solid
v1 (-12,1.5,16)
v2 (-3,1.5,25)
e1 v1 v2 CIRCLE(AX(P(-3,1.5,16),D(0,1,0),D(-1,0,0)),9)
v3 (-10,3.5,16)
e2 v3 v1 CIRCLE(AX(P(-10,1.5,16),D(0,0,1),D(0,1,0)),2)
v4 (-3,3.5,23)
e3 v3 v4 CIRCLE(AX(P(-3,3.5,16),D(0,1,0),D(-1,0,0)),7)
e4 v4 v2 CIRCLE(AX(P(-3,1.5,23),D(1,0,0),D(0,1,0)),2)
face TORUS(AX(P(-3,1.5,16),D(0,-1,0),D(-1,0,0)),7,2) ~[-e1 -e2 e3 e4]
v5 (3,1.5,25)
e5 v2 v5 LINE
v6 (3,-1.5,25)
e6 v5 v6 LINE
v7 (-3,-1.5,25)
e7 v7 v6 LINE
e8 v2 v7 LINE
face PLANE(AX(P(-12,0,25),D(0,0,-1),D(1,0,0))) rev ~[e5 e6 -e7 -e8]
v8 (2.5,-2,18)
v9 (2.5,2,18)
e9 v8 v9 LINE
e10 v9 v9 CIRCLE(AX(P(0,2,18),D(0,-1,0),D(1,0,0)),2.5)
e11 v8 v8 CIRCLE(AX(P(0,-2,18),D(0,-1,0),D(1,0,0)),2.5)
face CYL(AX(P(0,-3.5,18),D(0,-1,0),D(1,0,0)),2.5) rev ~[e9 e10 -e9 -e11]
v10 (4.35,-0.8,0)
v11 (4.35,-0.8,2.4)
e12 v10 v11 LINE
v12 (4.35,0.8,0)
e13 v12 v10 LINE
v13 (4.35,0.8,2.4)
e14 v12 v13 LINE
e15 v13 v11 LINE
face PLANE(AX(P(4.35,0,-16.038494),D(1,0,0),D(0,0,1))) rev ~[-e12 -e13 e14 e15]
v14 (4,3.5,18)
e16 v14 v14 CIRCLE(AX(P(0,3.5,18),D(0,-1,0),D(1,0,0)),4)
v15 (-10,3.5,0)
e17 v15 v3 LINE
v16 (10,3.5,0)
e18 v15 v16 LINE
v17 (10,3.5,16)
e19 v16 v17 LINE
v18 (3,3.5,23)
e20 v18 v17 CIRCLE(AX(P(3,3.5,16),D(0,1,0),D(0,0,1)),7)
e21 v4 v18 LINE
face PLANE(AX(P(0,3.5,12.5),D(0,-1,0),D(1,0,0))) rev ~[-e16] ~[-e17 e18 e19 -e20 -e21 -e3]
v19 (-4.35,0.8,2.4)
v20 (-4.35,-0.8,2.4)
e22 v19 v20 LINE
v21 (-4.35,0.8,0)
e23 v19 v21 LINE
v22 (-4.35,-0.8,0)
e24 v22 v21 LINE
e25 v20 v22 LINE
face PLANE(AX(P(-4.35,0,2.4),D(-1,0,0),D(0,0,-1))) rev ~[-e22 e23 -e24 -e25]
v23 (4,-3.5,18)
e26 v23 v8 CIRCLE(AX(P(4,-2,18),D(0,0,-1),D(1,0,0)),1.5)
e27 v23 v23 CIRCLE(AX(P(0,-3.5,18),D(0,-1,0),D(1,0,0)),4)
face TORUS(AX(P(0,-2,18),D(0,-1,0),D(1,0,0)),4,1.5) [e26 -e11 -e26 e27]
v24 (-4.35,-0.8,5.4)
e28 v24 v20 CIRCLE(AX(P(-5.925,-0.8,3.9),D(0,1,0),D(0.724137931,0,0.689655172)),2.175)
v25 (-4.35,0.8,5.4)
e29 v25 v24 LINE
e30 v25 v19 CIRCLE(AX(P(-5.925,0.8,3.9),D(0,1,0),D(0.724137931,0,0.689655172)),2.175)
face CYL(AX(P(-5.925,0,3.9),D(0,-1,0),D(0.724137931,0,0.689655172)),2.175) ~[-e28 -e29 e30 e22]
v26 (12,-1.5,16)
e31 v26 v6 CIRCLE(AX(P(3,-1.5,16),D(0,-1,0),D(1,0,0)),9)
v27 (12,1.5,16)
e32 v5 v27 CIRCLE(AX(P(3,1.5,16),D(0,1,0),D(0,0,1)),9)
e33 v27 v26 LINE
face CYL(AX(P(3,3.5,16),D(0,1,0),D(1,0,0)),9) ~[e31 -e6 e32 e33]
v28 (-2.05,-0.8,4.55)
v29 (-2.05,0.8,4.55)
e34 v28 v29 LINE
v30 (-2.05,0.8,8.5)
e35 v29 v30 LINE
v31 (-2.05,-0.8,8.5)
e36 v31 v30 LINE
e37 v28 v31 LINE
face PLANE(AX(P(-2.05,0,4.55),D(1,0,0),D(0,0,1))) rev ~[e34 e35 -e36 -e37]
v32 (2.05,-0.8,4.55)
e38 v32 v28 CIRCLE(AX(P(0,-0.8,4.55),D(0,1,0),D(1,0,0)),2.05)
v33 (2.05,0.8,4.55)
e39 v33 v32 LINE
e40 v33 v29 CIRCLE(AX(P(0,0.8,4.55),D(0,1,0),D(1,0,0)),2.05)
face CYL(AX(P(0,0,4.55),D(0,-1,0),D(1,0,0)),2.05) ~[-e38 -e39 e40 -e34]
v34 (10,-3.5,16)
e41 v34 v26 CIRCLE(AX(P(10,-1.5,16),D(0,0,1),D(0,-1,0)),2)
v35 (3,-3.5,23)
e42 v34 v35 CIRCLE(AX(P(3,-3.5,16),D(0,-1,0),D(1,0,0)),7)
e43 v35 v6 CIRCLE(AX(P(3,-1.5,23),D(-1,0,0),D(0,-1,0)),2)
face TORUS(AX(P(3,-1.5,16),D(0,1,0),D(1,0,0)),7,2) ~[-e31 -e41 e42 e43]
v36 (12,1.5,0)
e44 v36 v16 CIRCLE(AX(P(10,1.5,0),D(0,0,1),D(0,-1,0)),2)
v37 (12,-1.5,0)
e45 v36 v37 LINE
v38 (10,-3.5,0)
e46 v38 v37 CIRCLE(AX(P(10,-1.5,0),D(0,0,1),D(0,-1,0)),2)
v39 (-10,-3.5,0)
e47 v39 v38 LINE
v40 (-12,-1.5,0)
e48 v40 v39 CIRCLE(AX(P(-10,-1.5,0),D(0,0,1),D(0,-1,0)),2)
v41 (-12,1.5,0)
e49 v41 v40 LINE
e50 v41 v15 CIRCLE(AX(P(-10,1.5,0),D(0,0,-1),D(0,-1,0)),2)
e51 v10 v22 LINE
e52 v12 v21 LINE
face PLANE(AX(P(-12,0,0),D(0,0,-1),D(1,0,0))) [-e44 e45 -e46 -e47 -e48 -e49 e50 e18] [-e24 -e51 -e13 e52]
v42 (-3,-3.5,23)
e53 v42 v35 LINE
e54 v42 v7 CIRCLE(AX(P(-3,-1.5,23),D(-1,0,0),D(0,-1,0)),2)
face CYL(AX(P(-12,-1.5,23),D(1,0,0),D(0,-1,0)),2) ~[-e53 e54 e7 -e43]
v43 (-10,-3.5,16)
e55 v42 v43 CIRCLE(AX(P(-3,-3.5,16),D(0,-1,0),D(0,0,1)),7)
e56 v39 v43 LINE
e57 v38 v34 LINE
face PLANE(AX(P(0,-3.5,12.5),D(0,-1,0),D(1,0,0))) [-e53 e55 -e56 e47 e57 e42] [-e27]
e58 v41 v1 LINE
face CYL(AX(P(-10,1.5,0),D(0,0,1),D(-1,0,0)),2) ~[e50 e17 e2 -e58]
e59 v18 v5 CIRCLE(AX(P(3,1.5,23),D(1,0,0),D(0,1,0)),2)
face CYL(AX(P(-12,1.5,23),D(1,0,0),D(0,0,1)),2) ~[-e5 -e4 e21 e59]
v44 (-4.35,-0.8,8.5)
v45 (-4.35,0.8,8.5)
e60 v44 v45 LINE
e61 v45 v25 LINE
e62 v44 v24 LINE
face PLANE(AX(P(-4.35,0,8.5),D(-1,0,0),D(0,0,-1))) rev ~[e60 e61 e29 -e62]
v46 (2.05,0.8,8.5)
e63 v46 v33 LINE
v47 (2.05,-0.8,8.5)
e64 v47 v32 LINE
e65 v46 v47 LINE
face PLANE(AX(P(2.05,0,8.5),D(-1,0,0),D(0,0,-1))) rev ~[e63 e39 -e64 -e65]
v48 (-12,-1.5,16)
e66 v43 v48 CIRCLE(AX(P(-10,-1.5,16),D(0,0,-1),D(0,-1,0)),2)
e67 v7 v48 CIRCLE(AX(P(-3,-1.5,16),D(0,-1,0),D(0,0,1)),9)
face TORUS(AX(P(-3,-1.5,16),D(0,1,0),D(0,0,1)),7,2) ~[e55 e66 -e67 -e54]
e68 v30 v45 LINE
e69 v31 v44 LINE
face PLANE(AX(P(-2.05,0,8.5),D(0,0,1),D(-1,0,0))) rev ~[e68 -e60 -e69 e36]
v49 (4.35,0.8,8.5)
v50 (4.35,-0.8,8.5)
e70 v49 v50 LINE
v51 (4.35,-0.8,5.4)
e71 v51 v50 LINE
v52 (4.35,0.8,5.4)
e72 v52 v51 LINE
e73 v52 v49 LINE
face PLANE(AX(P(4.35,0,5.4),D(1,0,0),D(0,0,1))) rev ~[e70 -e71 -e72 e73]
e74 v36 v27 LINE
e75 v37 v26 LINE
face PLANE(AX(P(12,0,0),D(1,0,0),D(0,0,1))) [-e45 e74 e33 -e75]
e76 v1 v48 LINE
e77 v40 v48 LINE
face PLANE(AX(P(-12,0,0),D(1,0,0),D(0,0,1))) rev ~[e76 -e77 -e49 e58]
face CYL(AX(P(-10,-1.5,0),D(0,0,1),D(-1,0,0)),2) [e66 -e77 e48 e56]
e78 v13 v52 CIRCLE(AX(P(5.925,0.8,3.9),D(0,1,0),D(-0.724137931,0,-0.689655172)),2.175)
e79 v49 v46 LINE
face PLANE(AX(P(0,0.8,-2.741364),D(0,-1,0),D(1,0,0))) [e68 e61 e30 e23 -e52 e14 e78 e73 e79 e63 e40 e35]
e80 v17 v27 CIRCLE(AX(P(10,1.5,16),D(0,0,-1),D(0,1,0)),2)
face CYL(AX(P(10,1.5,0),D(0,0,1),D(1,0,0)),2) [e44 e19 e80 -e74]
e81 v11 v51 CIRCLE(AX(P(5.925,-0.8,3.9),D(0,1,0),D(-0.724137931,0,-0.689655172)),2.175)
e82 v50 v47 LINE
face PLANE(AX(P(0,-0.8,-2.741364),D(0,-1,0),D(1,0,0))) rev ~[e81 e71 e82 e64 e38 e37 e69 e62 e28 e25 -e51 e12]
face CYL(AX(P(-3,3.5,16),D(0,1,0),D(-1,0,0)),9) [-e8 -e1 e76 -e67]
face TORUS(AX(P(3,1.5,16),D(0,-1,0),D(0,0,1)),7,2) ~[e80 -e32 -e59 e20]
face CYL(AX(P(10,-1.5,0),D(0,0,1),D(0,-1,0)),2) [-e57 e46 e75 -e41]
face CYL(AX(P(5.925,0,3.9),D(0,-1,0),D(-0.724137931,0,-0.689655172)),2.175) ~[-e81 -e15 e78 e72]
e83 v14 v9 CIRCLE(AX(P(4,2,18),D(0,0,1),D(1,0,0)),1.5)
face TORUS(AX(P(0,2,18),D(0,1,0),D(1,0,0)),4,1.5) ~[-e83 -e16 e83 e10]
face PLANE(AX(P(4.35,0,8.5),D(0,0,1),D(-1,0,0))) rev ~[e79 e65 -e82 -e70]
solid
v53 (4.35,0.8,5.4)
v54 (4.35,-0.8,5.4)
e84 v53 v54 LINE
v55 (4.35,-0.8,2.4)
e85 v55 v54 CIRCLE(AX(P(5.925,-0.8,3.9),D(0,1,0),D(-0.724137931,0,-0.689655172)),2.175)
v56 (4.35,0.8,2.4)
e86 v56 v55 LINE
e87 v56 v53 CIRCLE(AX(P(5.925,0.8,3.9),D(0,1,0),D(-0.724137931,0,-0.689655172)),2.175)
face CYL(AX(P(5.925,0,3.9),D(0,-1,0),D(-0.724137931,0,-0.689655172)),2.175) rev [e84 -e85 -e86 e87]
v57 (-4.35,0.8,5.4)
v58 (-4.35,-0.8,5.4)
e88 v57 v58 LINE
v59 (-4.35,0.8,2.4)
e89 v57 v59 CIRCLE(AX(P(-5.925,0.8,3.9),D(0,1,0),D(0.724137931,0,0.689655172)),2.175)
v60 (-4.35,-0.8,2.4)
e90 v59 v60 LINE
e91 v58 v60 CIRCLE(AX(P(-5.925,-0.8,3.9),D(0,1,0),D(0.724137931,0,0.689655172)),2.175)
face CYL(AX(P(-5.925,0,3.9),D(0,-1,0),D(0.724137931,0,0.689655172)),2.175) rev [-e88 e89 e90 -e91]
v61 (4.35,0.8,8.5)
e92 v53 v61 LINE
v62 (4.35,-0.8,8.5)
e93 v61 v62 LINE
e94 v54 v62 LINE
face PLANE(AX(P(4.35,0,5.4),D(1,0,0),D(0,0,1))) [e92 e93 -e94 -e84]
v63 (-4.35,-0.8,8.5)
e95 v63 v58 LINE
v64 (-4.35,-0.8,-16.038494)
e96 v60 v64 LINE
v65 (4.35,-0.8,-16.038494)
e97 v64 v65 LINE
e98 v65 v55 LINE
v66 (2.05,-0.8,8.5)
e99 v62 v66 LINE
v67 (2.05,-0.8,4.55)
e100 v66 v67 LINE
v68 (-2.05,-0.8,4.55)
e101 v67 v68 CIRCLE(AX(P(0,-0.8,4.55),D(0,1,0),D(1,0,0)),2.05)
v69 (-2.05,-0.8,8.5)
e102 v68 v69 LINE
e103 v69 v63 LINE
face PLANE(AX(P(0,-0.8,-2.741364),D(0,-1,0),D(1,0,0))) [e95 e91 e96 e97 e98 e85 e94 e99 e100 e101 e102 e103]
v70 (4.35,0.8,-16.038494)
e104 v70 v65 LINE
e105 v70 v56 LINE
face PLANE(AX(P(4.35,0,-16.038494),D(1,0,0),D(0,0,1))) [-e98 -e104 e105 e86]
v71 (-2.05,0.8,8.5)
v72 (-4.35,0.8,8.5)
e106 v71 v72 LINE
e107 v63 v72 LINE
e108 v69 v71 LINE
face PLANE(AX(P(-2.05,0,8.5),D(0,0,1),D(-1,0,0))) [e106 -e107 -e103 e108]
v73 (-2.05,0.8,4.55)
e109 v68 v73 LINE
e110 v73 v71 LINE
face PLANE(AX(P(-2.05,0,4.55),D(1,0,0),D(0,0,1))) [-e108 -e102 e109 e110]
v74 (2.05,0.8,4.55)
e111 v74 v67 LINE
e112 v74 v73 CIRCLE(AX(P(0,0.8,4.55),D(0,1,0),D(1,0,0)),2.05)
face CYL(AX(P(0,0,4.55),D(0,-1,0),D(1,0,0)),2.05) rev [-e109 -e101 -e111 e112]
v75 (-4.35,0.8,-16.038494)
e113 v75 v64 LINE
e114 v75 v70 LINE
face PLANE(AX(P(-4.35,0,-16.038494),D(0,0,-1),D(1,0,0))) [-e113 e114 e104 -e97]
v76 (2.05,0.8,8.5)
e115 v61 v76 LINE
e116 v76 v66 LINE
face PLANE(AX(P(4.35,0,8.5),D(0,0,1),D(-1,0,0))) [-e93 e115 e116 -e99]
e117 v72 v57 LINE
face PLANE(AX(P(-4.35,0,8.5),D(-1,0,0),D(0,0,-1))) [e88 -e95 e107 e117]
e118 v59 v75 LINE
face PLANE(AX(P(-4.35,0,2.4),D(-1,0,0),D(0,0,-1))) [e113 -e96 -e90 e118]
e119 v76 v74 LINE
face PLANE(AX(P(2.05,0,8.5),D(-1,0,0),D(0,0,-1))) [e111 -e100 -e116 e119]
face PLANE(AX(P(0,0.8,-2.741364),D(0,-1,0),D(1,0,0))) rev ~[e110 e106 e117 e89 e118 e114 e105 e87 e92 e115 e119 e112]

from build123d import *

# Parameters (mm, degrees)
F0_W         = 24
F0_H         = 25
F1_DEPTH     = 3.5
F2_R         = 2
F4_DEPTH     = 0.8
F5_R         = 2.5
F6_DEPTH     = 7.001
F8_R         = 1.5
F9_T1_DEPTH  = 7
F9_T4_ANGLE  = 90
F9_T6_ANGLE  = 90
F9_T8_ANGLE  = 90
F9_T10_ANGLE = 90


# Not quite as in the source:
# - a fillet or chamfer that OpenCascade refuses, or shapes differently, is made with other operations: its cross-section is extruded or revolved along the edge and cut away or added


with BuildPart() as f1:
    # F0 (on Front) → F1 (new body, symmetric)
    with BuildSketch(Plane.XZ):
        with Locations((0, 12.5)):
            Rectangle(F0_W, F0_H)
    extrude(amount=F1_DEPTH, both=True)

    # F2
    f2_edges = [f1.edges().sort_by_distance(p)[0] for p in [
        (0, -3.5, 25),
        (0, 3.5, 25),
        (-12, -3.5, 12.5),
        (-12, 3.5, 12.5),
        (12, -3.5, 12.5),
        (12, 3.5, 12.5),
    ]]
    fillet(f2_edges, radius=F2_R)

    # F5 (on face) → F6 (cut, through all)
    with BuildSketch(Plane.XZ.offset(3.5)):
        with Locations((0, 18)):
            Circle(F5_R)
    extrude(amount=-F6_DEPTH, mode=Mode.SUBTRACT)


with BuildPart() as f4:
    # F3 (on Front) → F4 (new body, symmetric)
    with BuildSketch(Plane.XZ):
        with BuildLine():
            Line((-4.35, 8.5), (-4.35, 5.4))
            ThreePointArc((-4.35, 5.4), (-3.75, 3.9), (-4.35, 2.4))
            Line((-4.35, 2.4), (-4.35, -16.0384941622))
            Line((-4.35, -16.0384941622), (4.35, -16.0384941622))
            Line((4.35, -16.0384941622), (4.35, 2.4))
            ThreePointArc((4.35, 2.4), (3.75, 3.9), (4.35, 5.4))
            Line((4.35, 5.4), (4.35, 8.5))
            Line((4.35, 8.5), (2.05, 8.5))
            Line((2.05, 8.5), (2.05, 4.55))
            ThreePointArc((2.05, 4.55), (0, 2.5), (-2.05, 4.55))
            Line((-2.05, 4.55), (-2.05, 8.5))
            Line((-2.05, 8.5), (-4.35, 8.5))
        make_face()
    extrude(amount=F4_DEPTH, both=True)


with BuildPart() as f1_1:
    add(f1.part)

    # F7: cut F4
    add(f4.part, mode=Mode.SUBTRACT)

    # F8
    f8_edges = [f1_1.edges().sort_by_distance(p)[0] for p in [
        (-2.5, 3.5, 18),
        (-2.5, -3.5, 18),
    ]]
    fillet(f8_edges, radius=F8_R)

    # F9: fillet of radius 9 on 2 edges, made by hand

    # F9_s2 → F9_t1 (cut)
    with BuildSketch(Plane.XZ.offset(-3.5)):
        with BuildLine():
            ThreePointArc((12, 16), (9.3639610307, 22.3639610307), (3, 25))
            Line((3, 25), (12, 25))
            Line((12, 25), (12, 16))
        make_face()
        with BuildLine():
            ThreePointArc((-12, 16), (-9.3639610307, 22.3639610307), (-3, 25))
            Line((-3, 25), (-12, 25))
            Line((-12, 25), (-12, 16))
        make_face()
    extrude(amount=F9_T1_DEPTH, mode=Mode.SUBTRACT)

    # F9_s3 → F9_t4 (revolve, cut)
    with BuildSketch(Plane.XY.offset(16)):
        with BuildLine():
            ThreePointArc((-10, 3.5), (-11.4142135624, 2.9142135624), (-12, 1.5))
            Line((-12, 1.5), (-12, 3.5))
            Line((-12, 3.5), (-10, 3.5))
        make_face()
    revolve(axis=Axis((-3, 3.5, 16), (0, 1, 0)), revolution_arc=F9_T4_ANGLE, mode=Mode.SUBTRACT)

    # F9_s5 → F9_t6 (revolve, cut)
    with BuildSketch(Plane.YZ.offset(-3)):
        with BuildLine():
            ThreePointArc((-3.5, 23), (-2.9142135624, 24.4142135624), (-1.5, 25))
            Line((-1.5, 25), (-3.5, 25))
            Line((-3.5, 25), (-3.5, 23))
        make_face()
    revolve(axis=Axis((-3, -3.5, 16), (0, -1, 0)), revolution_arc=F9_T6_ANGLE, mode=Mode.SUBTRACT)

    # F9_s7 → F9_t8 (revolve, cut)
    with BuildSketch(Plane.XY.offset(16)):
        with BuildLine():
            ThreePointArc((10, -3.5), (11.4142135624, -2.9142135624), (12, -1.5))
            Line((12, -1.5), (12, -3.5))
            Line((12, -3.5), (10, -3.5))
        make_face()
    revolve(axis=Axis((3, -3.5, 16), (0, -1, 0)), revolution_arc=F9_T8_ANGLE, mode=Mode.SUBTRACT)

    # F9_s9 → F9_t10 (revolve, cut)
    with BuildSketch(Plane.YZ.offset(3)):
        with BuildLine():
            ThreePointArc((3.5, 23), (2.9142135624, 24.4142135624), (1.5, 25))
            Line((1.5, 25), (3.5, 25))
            Line((3.5, 25), (3.5, 23))
        make_face()
    revolve(axis=Axis((3, 3.5, 16), (0, 1, 0)), revolution_arc=F9_T10_ANGLE, mode=Mode.SUBTRACT)


solid = Compound([f4.part, f1_1.part])
